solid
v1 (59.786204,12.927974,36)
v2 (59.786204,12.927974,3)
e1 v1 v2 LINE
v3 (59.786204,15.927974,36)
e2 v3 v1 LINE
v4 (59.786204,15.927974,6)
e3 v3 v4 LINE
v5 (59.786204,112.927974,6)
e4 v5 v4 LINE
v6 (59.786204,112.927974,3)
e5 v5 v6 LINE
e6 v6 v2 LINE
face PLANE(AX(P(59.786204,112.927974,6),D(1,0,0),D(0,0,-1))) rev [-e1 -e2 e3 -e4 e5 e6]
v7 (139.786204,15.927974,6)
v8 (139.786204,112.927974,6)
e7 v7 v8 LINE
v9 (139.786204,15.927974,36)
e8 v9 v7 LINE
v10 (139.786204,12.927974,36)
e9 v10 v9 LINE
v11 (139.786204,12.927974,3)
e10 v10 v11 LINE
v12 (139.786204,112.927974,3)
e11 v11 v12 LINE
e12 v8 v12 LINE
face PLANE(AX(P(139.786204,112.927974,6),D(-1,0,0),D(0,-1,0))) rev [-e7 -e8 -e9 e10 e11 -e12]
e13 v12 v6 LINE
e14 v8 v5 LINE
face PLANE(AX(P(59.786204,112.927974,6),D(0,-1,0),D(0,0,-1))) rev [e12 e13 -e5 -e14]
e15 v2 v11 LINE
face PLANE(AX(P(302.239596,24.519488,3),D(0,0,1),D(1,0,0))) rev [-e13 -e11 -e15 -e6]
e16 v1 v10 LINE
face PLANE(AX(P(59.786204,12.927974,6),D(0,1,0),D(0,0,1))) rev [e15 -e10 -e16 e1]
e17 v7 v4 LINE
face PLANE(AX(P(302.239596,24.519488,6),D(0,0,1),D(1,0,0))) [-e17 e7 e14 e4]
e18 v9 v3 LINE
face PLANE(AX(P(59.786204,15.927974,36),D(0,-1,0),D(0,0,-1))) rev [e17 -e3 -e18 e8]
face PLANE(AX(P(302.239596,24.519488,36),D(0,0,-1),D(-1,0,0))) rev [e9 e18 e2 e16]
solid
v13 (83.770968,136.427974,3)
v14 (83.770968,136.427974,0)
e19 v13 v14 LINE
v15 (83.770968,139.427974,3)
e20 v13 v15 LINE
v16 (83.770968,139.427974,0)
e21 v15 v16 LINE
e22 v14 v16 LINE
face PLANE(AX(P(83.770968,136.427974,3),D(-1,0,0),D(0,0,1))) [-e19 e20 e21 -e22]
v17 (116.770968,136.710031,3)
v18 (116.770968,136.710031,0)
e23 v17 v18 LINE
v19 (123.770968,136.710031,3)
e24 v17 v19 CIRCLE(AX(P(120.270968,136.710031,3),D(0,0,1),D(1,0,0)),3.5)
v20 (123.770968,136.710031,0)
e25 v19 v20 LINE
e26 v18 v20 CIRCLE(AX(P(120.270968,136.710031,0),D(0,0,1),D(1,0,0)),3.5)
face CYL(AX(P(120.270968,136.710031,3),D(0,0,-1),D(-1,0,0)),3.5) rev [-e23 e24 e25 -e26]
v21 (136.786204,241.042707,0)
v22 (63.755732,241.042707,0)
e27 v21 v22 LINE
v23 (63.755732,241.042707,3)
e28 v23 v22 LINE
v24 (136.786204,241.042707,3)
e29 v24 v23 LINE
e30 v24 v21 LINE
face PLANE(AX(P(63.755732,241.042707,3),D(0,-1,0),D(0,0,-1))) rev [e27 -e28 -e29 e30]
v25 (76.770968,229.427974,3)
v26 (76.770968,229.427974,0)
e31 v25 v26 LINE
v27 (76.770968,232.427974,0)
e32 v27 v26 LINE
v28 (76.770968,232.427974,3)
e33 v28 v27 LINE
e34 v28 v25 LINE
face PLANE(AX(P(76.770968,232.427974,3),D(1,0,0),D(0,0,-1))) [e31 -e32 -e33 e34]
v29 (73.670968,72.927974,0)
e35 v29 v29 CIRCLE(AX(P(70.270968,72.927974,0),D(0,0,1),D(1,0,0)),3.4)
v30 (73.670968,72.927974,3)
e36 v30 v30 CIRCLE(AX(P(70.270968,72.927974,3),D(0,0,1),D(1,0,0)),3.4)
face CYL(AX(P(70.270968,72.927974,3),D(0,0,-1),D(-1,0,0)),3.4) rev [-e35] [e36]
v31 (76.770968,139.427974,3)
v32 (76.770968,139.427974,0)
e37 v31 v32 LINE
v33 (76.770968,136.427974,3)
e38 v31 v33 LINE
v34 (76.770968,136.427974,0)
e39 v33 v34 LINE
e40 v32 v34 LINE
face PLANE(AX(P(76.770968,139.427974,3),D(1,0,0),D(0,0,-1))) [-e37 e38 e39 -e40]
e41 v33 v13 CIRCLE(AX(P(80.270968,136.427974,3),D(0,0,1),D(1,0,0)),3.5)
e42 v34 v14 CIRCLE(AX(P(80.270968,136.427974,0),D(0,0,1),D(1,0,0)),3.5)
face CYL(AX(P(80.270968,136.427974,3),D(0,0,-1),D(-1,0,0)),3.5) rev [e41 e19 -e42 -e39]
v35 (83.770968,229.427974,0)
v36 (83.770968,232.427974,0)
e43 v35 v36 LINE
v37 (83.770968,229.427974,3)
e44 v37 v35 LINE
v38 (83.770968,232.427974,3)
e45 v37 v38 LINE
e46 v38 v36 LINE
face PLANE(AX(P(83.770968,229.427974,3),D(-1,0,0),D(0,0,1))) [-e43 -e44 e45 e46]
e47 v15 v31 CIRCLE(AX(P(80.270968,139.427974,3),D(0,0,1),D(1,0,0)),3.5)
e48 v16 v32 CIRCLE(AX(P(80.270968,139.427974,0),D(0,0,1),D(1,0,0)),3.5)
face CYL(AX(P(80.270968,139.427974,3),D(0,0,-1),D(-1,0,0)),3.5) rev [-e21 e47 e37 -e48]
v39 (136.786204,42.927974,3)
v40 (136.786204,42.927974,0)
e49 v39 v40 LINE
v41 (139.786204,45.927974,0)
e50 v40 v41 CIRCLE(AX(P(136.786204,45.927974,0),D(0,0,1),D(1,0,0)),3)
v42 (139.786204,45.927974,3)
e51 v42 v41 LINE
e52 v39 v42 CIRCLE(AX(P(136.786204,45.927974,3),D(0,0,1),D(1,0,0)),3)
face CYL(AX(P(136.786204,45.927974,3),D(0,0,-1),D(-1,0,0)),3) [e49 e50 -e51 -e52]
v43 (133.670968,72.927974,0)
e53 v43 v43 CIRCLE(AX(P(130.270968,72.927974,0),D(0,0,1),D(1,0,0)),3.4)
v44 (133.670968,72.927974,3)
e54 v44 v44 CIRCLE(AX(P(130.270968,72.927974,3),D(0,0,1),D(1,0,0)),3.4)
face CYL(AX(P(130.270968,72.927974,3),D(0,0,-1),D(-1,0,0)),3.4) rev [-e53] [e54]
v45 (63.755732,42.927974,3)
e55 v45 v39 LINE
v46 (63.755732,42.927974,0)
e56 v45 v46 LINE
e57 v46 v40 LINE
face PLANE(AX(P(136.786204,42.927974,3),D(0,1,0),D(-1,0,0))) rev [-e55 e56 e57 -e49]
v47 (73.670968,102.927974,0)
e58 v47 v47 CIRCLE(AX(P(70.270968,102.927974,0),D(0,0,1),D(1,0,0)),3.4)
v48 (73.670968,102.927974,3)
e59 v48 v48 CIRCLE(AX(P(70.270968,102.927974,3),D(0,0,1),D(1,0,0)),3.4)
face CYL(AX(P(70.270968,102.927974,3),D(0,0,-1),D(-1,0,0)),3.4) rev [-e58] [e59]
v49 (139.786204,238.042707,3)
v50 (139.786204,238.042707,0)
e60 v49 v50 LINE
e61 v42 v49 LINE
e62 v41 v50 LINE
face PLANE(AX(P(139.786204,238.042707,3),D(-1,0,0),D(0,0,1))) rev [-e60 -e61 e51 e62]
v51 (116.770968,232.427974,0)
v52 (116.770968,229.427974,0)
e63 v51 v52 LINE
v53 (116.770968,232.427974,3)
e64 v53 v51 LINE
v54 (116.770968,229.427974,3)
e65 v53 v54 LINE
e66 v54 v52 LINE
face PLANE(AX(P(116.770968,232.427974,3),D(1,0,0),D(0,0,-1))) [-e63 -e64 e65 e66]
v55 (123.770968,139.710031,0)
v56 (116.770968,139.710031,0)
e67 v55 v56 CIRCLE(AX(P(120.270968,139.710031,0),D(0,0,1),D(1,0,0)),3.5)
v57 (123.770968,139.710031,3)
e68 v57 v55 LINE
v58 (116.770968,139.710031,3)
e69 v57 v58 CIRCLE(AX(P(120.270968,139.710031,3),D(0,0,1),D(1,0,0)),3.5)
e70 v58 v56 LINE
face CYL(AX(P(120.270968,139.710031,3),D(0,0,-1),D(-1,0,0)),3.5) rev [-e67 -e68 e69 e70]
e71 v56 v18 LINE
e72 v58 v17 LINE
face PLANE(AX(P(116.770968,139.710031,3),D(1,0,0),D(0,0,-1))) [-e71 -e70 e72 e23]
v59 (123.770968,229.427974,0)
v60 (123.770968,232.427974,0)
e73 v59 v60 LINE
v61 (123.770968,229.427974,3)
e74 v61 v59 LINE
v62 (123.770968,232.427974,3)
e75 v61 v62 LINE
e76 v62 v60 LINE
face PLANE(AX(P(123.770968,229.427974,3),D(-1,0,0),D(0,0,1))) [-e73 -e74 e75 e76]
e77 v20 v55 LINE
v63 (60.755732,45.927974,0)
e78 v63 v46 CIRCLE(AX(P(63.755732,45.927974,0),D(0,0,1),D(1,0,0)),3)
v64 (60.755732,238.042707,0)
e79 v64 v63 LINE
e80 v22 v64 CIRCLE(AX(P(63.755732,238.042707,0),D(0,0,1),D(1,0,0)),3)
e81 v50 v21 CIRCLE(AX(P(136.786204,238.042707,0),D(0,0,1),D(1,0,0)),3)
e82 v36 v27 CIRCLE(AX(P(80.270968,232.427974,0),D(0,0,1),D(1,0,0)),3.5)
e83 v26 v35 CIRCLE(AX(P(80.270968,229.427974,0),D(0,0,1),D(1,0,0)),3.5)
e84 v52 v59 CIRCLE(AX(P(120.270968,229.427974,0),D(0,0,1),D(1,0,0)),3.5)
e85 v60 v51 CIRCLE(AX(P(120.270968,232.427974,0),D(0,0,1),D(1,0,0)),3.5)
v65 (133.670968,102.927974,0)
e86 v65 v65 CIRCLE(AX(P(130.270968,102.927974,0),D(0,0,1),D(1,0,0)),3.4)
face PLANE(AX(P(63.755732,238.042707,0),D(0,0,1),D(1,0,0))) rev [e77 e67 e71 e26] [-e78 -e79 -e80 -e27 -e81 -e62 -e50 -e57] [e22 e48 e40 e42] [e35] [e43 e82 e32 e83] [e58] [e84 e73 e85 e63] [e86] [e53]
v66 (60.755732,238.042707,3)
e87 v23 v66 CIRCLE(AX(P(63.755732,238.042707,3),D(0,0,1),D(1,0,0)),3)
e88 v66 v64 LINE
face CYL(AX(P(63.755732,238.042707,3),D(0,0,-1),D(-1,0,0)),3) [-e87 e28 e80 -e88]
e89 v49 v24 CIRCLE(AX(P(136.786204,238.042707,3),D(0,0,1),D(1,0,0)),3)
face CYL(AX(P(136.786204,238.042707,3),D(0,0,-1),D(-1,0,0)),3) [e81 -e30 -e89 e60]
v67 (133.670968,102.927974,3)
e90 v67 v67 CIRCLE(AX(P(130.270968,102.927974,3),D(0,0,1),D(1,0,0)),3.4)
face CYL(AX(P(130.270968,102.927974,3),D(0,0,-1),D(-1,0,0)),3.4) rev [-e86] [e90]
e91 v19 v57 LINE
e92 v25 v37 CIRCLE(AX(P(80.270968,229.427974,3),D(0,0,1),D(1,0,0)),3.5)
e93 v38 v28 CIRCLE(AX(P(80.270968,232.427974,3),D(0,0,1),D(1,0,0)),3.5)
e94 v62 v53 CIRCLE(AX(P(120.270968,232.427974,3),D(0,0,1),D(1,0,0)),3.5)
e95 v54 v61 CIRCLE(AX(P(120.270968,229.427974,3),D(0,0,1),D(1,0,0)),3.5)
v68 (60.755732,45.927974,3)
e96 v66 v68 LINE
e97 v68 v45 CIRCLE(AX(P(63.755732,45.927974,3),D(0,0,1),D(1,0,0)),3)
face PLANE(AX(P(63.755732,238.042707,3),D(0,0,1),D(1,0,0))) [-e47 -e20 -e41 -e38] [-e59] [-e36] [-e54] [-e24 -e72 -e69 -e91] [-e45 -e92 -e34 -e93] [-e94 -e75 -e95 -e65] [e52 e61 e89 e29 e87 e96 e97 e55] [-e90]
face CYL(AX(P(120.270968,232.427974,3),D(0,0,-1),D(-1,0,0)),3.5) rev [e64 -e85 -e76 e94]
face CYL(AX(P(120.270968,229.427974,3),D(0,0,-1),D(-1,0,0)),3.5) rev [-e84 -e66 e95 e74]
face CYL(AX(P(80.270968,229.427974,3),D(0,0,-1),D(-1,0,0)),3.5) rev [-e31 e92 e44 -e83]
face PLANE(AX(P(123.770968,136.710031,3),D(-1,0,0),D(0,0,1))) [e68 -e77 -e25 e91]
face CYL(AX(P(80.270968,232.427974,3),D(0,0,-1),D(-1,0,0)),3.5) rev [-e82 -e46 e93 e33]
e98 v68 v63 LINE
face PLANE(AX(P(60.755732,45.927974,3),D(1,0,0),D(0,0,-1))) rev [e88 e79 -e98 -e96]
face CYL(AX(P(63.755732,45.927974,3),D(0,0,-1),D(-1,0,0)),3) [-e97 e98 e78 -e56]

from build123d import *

# Parameters (mm, degrees)
MODEL_R             = 3.4
BOSS_EXTRUDE1_DEPTH = 3
SKETCH2_W           = 80
SKETCH2_H           = 100
BOSS_EXTRUDE2_DEPTH = 3
SKETCH3_W           = 80
SKETCH3_H           = 3
BOSS_EXTRUDE3_DEPTH = 30


with BuildPart() as part:
    # Model → Boss-Extrude1 (new body)
    with BuildSketch(Plane.XY):
        with BuildLine():
            Line((60.755732344, 45.927973601), (60.755732344, 238.042706995))
            ThreePointArc((60.755732344, 238.042706995), (61.634412001, 240.164027338), (63.755732344, 241.042706995))
            Line((63.755732344, 241.042706995), (136.786203682, 241.042706995))
            ThreePointArc((136.786203682, 241.042706995), (138.907524026, 240.164027338), (139.786203682, 238.042706995))
            Line((139.786203682, 238.042706995), (139.786203682, 45.927973601))
            ThreePointArc((139.786203682, 45.927973601), (138.907524026, 43.806653257), (136.786203682, 42.927973601))
            Line((136.786203682, 42.927973601), (63.755732344, 42.927973601))
            ThreePointArc((63.755732344, 42.927973601), (61.634412001, 43.806653257), (60.755732344, 45.927973601))
        make_face()
        with Locations((70.270968013, 102.927973601)):
            Circle(MODEL_R, mode=Mode.SUBTRACT)
        with Locations((70.270968013, 72.927973601)):
            Circle(MODEL_R, mode=Mode.SUBTRACT)
        with Locations((130.270968013, 102.927973601)):
            Circle(MODEL_R, mode=Mode.SUBTRACT)
        with Locations((130.270968013, 72.927973601)):
            Circle(MODEL_R, mode=Mode.SUBTRACT)
        with BuildLine():
            Line((83.770968013, 136.427973601), (83.770968013, 139.427973601))
            ThreePointArc((83.770968013, 139.427973601), (80.270968013, 142.927973601), (76.770968013, 139.427973601))
            Line((76.770968013, 139.427973601), (76.770968013, 136.427973601))
            ThreePointArc((76.770968013, 136.427973601), (80.270968013, 132.927973601), (83.770968013, 136.427973601))
        make_face(mode=Mode.SUBTRACT)
        with BuildLine():
            Line((123.770968013, 136.710031471), (123.770968013, 139.710031471))
            ThreePointArc((123.770968013, 139.710031471), (120.270968013, 143.210031471), (116.770968013, 139.710031471))
            Line((116.770968013, 139.710031471), (116.770968013, 136.710031471))
            ThreePointArc((116.770968013, 136.710031471), (120.270968013, 133.210031471), (123.770968013, 136.710031471))
        make_face(mode=Mode.SUBTRACT)
        with BuildLine():
            Line((83.770968013, 229.427973601), (83.770968013, 232.427973601))
            ThreePointArc((83.770968013, 232.427973601), (80.270968013, 235.927973601), (76.770968013, 232.427973601))
            Line((76.770968013, 232.427973601), (76.770968013, 229.427973601))
            ThreePointArc((76.770968013, 229.427973601), (80.270968013, 225.927973601), (83.770968013, 229.427973601))
        make_face(mode=Mode.SUBTRACT)
        with BuildLine():
            Line((123.770968013, 229.427973601), (123.770968013, 232.427973601))
            ThreePointArc((123.770968013, 232.427973601), (120.270968013, 235.927973601), (116.770968013, 232.427973601))
            Line((116.770968013, 232.427973601), (116.770968013, 229.427973601))
            ThreePointArc((116.770968013, 229.427973601), (120.270968013, 225.927973601), (123.770968013, 229.427973601))
        make_face(mode=Mode.SUBTRACT)
    extrude(amount=BOSS_EXTRUDE1_DEPTH)


with BuildPart() as body_2:
    # Sketch2 → Boss-Extrude2 (new body)
    with BuildSketch(Plane.XY.offset(3)):
        with Locations((-202.453392637, 38.408485808)):
            Rectangle(SKETCH2_W, SKETCH2_H)
    extrude(amount=BOSS_EXTRUDE2_DEPTH)

    # Sketch3 → Boss-Extrude3 (add)
    with BuildSketch(Plane.XY.offset(6)):
        with Locations((-202.453392637, -10.091514192)):
            Rectangle(SKETCH3_W, SKETCH3_H)
    extrude(amount=BOSS_EXTRUDE3_DEPTH)


with BuildPart() as body_2_1:
    # Body-Move/Copy2: read off the stored shape, not the designer's step
    # Body-Move/Copy2: moved
    add(body_2.part.moved(Location((302.2395963, 0, 0))))


with BuildPart() as body_2_2:
    # Body-Move/Copy4: read off the stored shape, not the designer's step
    # Body-Move/Copy4: moved
    add(body_2_1.part.moved(Location((0, 24.5194878, 0))))


solid = Compound([part.part, body_2_2.part])
